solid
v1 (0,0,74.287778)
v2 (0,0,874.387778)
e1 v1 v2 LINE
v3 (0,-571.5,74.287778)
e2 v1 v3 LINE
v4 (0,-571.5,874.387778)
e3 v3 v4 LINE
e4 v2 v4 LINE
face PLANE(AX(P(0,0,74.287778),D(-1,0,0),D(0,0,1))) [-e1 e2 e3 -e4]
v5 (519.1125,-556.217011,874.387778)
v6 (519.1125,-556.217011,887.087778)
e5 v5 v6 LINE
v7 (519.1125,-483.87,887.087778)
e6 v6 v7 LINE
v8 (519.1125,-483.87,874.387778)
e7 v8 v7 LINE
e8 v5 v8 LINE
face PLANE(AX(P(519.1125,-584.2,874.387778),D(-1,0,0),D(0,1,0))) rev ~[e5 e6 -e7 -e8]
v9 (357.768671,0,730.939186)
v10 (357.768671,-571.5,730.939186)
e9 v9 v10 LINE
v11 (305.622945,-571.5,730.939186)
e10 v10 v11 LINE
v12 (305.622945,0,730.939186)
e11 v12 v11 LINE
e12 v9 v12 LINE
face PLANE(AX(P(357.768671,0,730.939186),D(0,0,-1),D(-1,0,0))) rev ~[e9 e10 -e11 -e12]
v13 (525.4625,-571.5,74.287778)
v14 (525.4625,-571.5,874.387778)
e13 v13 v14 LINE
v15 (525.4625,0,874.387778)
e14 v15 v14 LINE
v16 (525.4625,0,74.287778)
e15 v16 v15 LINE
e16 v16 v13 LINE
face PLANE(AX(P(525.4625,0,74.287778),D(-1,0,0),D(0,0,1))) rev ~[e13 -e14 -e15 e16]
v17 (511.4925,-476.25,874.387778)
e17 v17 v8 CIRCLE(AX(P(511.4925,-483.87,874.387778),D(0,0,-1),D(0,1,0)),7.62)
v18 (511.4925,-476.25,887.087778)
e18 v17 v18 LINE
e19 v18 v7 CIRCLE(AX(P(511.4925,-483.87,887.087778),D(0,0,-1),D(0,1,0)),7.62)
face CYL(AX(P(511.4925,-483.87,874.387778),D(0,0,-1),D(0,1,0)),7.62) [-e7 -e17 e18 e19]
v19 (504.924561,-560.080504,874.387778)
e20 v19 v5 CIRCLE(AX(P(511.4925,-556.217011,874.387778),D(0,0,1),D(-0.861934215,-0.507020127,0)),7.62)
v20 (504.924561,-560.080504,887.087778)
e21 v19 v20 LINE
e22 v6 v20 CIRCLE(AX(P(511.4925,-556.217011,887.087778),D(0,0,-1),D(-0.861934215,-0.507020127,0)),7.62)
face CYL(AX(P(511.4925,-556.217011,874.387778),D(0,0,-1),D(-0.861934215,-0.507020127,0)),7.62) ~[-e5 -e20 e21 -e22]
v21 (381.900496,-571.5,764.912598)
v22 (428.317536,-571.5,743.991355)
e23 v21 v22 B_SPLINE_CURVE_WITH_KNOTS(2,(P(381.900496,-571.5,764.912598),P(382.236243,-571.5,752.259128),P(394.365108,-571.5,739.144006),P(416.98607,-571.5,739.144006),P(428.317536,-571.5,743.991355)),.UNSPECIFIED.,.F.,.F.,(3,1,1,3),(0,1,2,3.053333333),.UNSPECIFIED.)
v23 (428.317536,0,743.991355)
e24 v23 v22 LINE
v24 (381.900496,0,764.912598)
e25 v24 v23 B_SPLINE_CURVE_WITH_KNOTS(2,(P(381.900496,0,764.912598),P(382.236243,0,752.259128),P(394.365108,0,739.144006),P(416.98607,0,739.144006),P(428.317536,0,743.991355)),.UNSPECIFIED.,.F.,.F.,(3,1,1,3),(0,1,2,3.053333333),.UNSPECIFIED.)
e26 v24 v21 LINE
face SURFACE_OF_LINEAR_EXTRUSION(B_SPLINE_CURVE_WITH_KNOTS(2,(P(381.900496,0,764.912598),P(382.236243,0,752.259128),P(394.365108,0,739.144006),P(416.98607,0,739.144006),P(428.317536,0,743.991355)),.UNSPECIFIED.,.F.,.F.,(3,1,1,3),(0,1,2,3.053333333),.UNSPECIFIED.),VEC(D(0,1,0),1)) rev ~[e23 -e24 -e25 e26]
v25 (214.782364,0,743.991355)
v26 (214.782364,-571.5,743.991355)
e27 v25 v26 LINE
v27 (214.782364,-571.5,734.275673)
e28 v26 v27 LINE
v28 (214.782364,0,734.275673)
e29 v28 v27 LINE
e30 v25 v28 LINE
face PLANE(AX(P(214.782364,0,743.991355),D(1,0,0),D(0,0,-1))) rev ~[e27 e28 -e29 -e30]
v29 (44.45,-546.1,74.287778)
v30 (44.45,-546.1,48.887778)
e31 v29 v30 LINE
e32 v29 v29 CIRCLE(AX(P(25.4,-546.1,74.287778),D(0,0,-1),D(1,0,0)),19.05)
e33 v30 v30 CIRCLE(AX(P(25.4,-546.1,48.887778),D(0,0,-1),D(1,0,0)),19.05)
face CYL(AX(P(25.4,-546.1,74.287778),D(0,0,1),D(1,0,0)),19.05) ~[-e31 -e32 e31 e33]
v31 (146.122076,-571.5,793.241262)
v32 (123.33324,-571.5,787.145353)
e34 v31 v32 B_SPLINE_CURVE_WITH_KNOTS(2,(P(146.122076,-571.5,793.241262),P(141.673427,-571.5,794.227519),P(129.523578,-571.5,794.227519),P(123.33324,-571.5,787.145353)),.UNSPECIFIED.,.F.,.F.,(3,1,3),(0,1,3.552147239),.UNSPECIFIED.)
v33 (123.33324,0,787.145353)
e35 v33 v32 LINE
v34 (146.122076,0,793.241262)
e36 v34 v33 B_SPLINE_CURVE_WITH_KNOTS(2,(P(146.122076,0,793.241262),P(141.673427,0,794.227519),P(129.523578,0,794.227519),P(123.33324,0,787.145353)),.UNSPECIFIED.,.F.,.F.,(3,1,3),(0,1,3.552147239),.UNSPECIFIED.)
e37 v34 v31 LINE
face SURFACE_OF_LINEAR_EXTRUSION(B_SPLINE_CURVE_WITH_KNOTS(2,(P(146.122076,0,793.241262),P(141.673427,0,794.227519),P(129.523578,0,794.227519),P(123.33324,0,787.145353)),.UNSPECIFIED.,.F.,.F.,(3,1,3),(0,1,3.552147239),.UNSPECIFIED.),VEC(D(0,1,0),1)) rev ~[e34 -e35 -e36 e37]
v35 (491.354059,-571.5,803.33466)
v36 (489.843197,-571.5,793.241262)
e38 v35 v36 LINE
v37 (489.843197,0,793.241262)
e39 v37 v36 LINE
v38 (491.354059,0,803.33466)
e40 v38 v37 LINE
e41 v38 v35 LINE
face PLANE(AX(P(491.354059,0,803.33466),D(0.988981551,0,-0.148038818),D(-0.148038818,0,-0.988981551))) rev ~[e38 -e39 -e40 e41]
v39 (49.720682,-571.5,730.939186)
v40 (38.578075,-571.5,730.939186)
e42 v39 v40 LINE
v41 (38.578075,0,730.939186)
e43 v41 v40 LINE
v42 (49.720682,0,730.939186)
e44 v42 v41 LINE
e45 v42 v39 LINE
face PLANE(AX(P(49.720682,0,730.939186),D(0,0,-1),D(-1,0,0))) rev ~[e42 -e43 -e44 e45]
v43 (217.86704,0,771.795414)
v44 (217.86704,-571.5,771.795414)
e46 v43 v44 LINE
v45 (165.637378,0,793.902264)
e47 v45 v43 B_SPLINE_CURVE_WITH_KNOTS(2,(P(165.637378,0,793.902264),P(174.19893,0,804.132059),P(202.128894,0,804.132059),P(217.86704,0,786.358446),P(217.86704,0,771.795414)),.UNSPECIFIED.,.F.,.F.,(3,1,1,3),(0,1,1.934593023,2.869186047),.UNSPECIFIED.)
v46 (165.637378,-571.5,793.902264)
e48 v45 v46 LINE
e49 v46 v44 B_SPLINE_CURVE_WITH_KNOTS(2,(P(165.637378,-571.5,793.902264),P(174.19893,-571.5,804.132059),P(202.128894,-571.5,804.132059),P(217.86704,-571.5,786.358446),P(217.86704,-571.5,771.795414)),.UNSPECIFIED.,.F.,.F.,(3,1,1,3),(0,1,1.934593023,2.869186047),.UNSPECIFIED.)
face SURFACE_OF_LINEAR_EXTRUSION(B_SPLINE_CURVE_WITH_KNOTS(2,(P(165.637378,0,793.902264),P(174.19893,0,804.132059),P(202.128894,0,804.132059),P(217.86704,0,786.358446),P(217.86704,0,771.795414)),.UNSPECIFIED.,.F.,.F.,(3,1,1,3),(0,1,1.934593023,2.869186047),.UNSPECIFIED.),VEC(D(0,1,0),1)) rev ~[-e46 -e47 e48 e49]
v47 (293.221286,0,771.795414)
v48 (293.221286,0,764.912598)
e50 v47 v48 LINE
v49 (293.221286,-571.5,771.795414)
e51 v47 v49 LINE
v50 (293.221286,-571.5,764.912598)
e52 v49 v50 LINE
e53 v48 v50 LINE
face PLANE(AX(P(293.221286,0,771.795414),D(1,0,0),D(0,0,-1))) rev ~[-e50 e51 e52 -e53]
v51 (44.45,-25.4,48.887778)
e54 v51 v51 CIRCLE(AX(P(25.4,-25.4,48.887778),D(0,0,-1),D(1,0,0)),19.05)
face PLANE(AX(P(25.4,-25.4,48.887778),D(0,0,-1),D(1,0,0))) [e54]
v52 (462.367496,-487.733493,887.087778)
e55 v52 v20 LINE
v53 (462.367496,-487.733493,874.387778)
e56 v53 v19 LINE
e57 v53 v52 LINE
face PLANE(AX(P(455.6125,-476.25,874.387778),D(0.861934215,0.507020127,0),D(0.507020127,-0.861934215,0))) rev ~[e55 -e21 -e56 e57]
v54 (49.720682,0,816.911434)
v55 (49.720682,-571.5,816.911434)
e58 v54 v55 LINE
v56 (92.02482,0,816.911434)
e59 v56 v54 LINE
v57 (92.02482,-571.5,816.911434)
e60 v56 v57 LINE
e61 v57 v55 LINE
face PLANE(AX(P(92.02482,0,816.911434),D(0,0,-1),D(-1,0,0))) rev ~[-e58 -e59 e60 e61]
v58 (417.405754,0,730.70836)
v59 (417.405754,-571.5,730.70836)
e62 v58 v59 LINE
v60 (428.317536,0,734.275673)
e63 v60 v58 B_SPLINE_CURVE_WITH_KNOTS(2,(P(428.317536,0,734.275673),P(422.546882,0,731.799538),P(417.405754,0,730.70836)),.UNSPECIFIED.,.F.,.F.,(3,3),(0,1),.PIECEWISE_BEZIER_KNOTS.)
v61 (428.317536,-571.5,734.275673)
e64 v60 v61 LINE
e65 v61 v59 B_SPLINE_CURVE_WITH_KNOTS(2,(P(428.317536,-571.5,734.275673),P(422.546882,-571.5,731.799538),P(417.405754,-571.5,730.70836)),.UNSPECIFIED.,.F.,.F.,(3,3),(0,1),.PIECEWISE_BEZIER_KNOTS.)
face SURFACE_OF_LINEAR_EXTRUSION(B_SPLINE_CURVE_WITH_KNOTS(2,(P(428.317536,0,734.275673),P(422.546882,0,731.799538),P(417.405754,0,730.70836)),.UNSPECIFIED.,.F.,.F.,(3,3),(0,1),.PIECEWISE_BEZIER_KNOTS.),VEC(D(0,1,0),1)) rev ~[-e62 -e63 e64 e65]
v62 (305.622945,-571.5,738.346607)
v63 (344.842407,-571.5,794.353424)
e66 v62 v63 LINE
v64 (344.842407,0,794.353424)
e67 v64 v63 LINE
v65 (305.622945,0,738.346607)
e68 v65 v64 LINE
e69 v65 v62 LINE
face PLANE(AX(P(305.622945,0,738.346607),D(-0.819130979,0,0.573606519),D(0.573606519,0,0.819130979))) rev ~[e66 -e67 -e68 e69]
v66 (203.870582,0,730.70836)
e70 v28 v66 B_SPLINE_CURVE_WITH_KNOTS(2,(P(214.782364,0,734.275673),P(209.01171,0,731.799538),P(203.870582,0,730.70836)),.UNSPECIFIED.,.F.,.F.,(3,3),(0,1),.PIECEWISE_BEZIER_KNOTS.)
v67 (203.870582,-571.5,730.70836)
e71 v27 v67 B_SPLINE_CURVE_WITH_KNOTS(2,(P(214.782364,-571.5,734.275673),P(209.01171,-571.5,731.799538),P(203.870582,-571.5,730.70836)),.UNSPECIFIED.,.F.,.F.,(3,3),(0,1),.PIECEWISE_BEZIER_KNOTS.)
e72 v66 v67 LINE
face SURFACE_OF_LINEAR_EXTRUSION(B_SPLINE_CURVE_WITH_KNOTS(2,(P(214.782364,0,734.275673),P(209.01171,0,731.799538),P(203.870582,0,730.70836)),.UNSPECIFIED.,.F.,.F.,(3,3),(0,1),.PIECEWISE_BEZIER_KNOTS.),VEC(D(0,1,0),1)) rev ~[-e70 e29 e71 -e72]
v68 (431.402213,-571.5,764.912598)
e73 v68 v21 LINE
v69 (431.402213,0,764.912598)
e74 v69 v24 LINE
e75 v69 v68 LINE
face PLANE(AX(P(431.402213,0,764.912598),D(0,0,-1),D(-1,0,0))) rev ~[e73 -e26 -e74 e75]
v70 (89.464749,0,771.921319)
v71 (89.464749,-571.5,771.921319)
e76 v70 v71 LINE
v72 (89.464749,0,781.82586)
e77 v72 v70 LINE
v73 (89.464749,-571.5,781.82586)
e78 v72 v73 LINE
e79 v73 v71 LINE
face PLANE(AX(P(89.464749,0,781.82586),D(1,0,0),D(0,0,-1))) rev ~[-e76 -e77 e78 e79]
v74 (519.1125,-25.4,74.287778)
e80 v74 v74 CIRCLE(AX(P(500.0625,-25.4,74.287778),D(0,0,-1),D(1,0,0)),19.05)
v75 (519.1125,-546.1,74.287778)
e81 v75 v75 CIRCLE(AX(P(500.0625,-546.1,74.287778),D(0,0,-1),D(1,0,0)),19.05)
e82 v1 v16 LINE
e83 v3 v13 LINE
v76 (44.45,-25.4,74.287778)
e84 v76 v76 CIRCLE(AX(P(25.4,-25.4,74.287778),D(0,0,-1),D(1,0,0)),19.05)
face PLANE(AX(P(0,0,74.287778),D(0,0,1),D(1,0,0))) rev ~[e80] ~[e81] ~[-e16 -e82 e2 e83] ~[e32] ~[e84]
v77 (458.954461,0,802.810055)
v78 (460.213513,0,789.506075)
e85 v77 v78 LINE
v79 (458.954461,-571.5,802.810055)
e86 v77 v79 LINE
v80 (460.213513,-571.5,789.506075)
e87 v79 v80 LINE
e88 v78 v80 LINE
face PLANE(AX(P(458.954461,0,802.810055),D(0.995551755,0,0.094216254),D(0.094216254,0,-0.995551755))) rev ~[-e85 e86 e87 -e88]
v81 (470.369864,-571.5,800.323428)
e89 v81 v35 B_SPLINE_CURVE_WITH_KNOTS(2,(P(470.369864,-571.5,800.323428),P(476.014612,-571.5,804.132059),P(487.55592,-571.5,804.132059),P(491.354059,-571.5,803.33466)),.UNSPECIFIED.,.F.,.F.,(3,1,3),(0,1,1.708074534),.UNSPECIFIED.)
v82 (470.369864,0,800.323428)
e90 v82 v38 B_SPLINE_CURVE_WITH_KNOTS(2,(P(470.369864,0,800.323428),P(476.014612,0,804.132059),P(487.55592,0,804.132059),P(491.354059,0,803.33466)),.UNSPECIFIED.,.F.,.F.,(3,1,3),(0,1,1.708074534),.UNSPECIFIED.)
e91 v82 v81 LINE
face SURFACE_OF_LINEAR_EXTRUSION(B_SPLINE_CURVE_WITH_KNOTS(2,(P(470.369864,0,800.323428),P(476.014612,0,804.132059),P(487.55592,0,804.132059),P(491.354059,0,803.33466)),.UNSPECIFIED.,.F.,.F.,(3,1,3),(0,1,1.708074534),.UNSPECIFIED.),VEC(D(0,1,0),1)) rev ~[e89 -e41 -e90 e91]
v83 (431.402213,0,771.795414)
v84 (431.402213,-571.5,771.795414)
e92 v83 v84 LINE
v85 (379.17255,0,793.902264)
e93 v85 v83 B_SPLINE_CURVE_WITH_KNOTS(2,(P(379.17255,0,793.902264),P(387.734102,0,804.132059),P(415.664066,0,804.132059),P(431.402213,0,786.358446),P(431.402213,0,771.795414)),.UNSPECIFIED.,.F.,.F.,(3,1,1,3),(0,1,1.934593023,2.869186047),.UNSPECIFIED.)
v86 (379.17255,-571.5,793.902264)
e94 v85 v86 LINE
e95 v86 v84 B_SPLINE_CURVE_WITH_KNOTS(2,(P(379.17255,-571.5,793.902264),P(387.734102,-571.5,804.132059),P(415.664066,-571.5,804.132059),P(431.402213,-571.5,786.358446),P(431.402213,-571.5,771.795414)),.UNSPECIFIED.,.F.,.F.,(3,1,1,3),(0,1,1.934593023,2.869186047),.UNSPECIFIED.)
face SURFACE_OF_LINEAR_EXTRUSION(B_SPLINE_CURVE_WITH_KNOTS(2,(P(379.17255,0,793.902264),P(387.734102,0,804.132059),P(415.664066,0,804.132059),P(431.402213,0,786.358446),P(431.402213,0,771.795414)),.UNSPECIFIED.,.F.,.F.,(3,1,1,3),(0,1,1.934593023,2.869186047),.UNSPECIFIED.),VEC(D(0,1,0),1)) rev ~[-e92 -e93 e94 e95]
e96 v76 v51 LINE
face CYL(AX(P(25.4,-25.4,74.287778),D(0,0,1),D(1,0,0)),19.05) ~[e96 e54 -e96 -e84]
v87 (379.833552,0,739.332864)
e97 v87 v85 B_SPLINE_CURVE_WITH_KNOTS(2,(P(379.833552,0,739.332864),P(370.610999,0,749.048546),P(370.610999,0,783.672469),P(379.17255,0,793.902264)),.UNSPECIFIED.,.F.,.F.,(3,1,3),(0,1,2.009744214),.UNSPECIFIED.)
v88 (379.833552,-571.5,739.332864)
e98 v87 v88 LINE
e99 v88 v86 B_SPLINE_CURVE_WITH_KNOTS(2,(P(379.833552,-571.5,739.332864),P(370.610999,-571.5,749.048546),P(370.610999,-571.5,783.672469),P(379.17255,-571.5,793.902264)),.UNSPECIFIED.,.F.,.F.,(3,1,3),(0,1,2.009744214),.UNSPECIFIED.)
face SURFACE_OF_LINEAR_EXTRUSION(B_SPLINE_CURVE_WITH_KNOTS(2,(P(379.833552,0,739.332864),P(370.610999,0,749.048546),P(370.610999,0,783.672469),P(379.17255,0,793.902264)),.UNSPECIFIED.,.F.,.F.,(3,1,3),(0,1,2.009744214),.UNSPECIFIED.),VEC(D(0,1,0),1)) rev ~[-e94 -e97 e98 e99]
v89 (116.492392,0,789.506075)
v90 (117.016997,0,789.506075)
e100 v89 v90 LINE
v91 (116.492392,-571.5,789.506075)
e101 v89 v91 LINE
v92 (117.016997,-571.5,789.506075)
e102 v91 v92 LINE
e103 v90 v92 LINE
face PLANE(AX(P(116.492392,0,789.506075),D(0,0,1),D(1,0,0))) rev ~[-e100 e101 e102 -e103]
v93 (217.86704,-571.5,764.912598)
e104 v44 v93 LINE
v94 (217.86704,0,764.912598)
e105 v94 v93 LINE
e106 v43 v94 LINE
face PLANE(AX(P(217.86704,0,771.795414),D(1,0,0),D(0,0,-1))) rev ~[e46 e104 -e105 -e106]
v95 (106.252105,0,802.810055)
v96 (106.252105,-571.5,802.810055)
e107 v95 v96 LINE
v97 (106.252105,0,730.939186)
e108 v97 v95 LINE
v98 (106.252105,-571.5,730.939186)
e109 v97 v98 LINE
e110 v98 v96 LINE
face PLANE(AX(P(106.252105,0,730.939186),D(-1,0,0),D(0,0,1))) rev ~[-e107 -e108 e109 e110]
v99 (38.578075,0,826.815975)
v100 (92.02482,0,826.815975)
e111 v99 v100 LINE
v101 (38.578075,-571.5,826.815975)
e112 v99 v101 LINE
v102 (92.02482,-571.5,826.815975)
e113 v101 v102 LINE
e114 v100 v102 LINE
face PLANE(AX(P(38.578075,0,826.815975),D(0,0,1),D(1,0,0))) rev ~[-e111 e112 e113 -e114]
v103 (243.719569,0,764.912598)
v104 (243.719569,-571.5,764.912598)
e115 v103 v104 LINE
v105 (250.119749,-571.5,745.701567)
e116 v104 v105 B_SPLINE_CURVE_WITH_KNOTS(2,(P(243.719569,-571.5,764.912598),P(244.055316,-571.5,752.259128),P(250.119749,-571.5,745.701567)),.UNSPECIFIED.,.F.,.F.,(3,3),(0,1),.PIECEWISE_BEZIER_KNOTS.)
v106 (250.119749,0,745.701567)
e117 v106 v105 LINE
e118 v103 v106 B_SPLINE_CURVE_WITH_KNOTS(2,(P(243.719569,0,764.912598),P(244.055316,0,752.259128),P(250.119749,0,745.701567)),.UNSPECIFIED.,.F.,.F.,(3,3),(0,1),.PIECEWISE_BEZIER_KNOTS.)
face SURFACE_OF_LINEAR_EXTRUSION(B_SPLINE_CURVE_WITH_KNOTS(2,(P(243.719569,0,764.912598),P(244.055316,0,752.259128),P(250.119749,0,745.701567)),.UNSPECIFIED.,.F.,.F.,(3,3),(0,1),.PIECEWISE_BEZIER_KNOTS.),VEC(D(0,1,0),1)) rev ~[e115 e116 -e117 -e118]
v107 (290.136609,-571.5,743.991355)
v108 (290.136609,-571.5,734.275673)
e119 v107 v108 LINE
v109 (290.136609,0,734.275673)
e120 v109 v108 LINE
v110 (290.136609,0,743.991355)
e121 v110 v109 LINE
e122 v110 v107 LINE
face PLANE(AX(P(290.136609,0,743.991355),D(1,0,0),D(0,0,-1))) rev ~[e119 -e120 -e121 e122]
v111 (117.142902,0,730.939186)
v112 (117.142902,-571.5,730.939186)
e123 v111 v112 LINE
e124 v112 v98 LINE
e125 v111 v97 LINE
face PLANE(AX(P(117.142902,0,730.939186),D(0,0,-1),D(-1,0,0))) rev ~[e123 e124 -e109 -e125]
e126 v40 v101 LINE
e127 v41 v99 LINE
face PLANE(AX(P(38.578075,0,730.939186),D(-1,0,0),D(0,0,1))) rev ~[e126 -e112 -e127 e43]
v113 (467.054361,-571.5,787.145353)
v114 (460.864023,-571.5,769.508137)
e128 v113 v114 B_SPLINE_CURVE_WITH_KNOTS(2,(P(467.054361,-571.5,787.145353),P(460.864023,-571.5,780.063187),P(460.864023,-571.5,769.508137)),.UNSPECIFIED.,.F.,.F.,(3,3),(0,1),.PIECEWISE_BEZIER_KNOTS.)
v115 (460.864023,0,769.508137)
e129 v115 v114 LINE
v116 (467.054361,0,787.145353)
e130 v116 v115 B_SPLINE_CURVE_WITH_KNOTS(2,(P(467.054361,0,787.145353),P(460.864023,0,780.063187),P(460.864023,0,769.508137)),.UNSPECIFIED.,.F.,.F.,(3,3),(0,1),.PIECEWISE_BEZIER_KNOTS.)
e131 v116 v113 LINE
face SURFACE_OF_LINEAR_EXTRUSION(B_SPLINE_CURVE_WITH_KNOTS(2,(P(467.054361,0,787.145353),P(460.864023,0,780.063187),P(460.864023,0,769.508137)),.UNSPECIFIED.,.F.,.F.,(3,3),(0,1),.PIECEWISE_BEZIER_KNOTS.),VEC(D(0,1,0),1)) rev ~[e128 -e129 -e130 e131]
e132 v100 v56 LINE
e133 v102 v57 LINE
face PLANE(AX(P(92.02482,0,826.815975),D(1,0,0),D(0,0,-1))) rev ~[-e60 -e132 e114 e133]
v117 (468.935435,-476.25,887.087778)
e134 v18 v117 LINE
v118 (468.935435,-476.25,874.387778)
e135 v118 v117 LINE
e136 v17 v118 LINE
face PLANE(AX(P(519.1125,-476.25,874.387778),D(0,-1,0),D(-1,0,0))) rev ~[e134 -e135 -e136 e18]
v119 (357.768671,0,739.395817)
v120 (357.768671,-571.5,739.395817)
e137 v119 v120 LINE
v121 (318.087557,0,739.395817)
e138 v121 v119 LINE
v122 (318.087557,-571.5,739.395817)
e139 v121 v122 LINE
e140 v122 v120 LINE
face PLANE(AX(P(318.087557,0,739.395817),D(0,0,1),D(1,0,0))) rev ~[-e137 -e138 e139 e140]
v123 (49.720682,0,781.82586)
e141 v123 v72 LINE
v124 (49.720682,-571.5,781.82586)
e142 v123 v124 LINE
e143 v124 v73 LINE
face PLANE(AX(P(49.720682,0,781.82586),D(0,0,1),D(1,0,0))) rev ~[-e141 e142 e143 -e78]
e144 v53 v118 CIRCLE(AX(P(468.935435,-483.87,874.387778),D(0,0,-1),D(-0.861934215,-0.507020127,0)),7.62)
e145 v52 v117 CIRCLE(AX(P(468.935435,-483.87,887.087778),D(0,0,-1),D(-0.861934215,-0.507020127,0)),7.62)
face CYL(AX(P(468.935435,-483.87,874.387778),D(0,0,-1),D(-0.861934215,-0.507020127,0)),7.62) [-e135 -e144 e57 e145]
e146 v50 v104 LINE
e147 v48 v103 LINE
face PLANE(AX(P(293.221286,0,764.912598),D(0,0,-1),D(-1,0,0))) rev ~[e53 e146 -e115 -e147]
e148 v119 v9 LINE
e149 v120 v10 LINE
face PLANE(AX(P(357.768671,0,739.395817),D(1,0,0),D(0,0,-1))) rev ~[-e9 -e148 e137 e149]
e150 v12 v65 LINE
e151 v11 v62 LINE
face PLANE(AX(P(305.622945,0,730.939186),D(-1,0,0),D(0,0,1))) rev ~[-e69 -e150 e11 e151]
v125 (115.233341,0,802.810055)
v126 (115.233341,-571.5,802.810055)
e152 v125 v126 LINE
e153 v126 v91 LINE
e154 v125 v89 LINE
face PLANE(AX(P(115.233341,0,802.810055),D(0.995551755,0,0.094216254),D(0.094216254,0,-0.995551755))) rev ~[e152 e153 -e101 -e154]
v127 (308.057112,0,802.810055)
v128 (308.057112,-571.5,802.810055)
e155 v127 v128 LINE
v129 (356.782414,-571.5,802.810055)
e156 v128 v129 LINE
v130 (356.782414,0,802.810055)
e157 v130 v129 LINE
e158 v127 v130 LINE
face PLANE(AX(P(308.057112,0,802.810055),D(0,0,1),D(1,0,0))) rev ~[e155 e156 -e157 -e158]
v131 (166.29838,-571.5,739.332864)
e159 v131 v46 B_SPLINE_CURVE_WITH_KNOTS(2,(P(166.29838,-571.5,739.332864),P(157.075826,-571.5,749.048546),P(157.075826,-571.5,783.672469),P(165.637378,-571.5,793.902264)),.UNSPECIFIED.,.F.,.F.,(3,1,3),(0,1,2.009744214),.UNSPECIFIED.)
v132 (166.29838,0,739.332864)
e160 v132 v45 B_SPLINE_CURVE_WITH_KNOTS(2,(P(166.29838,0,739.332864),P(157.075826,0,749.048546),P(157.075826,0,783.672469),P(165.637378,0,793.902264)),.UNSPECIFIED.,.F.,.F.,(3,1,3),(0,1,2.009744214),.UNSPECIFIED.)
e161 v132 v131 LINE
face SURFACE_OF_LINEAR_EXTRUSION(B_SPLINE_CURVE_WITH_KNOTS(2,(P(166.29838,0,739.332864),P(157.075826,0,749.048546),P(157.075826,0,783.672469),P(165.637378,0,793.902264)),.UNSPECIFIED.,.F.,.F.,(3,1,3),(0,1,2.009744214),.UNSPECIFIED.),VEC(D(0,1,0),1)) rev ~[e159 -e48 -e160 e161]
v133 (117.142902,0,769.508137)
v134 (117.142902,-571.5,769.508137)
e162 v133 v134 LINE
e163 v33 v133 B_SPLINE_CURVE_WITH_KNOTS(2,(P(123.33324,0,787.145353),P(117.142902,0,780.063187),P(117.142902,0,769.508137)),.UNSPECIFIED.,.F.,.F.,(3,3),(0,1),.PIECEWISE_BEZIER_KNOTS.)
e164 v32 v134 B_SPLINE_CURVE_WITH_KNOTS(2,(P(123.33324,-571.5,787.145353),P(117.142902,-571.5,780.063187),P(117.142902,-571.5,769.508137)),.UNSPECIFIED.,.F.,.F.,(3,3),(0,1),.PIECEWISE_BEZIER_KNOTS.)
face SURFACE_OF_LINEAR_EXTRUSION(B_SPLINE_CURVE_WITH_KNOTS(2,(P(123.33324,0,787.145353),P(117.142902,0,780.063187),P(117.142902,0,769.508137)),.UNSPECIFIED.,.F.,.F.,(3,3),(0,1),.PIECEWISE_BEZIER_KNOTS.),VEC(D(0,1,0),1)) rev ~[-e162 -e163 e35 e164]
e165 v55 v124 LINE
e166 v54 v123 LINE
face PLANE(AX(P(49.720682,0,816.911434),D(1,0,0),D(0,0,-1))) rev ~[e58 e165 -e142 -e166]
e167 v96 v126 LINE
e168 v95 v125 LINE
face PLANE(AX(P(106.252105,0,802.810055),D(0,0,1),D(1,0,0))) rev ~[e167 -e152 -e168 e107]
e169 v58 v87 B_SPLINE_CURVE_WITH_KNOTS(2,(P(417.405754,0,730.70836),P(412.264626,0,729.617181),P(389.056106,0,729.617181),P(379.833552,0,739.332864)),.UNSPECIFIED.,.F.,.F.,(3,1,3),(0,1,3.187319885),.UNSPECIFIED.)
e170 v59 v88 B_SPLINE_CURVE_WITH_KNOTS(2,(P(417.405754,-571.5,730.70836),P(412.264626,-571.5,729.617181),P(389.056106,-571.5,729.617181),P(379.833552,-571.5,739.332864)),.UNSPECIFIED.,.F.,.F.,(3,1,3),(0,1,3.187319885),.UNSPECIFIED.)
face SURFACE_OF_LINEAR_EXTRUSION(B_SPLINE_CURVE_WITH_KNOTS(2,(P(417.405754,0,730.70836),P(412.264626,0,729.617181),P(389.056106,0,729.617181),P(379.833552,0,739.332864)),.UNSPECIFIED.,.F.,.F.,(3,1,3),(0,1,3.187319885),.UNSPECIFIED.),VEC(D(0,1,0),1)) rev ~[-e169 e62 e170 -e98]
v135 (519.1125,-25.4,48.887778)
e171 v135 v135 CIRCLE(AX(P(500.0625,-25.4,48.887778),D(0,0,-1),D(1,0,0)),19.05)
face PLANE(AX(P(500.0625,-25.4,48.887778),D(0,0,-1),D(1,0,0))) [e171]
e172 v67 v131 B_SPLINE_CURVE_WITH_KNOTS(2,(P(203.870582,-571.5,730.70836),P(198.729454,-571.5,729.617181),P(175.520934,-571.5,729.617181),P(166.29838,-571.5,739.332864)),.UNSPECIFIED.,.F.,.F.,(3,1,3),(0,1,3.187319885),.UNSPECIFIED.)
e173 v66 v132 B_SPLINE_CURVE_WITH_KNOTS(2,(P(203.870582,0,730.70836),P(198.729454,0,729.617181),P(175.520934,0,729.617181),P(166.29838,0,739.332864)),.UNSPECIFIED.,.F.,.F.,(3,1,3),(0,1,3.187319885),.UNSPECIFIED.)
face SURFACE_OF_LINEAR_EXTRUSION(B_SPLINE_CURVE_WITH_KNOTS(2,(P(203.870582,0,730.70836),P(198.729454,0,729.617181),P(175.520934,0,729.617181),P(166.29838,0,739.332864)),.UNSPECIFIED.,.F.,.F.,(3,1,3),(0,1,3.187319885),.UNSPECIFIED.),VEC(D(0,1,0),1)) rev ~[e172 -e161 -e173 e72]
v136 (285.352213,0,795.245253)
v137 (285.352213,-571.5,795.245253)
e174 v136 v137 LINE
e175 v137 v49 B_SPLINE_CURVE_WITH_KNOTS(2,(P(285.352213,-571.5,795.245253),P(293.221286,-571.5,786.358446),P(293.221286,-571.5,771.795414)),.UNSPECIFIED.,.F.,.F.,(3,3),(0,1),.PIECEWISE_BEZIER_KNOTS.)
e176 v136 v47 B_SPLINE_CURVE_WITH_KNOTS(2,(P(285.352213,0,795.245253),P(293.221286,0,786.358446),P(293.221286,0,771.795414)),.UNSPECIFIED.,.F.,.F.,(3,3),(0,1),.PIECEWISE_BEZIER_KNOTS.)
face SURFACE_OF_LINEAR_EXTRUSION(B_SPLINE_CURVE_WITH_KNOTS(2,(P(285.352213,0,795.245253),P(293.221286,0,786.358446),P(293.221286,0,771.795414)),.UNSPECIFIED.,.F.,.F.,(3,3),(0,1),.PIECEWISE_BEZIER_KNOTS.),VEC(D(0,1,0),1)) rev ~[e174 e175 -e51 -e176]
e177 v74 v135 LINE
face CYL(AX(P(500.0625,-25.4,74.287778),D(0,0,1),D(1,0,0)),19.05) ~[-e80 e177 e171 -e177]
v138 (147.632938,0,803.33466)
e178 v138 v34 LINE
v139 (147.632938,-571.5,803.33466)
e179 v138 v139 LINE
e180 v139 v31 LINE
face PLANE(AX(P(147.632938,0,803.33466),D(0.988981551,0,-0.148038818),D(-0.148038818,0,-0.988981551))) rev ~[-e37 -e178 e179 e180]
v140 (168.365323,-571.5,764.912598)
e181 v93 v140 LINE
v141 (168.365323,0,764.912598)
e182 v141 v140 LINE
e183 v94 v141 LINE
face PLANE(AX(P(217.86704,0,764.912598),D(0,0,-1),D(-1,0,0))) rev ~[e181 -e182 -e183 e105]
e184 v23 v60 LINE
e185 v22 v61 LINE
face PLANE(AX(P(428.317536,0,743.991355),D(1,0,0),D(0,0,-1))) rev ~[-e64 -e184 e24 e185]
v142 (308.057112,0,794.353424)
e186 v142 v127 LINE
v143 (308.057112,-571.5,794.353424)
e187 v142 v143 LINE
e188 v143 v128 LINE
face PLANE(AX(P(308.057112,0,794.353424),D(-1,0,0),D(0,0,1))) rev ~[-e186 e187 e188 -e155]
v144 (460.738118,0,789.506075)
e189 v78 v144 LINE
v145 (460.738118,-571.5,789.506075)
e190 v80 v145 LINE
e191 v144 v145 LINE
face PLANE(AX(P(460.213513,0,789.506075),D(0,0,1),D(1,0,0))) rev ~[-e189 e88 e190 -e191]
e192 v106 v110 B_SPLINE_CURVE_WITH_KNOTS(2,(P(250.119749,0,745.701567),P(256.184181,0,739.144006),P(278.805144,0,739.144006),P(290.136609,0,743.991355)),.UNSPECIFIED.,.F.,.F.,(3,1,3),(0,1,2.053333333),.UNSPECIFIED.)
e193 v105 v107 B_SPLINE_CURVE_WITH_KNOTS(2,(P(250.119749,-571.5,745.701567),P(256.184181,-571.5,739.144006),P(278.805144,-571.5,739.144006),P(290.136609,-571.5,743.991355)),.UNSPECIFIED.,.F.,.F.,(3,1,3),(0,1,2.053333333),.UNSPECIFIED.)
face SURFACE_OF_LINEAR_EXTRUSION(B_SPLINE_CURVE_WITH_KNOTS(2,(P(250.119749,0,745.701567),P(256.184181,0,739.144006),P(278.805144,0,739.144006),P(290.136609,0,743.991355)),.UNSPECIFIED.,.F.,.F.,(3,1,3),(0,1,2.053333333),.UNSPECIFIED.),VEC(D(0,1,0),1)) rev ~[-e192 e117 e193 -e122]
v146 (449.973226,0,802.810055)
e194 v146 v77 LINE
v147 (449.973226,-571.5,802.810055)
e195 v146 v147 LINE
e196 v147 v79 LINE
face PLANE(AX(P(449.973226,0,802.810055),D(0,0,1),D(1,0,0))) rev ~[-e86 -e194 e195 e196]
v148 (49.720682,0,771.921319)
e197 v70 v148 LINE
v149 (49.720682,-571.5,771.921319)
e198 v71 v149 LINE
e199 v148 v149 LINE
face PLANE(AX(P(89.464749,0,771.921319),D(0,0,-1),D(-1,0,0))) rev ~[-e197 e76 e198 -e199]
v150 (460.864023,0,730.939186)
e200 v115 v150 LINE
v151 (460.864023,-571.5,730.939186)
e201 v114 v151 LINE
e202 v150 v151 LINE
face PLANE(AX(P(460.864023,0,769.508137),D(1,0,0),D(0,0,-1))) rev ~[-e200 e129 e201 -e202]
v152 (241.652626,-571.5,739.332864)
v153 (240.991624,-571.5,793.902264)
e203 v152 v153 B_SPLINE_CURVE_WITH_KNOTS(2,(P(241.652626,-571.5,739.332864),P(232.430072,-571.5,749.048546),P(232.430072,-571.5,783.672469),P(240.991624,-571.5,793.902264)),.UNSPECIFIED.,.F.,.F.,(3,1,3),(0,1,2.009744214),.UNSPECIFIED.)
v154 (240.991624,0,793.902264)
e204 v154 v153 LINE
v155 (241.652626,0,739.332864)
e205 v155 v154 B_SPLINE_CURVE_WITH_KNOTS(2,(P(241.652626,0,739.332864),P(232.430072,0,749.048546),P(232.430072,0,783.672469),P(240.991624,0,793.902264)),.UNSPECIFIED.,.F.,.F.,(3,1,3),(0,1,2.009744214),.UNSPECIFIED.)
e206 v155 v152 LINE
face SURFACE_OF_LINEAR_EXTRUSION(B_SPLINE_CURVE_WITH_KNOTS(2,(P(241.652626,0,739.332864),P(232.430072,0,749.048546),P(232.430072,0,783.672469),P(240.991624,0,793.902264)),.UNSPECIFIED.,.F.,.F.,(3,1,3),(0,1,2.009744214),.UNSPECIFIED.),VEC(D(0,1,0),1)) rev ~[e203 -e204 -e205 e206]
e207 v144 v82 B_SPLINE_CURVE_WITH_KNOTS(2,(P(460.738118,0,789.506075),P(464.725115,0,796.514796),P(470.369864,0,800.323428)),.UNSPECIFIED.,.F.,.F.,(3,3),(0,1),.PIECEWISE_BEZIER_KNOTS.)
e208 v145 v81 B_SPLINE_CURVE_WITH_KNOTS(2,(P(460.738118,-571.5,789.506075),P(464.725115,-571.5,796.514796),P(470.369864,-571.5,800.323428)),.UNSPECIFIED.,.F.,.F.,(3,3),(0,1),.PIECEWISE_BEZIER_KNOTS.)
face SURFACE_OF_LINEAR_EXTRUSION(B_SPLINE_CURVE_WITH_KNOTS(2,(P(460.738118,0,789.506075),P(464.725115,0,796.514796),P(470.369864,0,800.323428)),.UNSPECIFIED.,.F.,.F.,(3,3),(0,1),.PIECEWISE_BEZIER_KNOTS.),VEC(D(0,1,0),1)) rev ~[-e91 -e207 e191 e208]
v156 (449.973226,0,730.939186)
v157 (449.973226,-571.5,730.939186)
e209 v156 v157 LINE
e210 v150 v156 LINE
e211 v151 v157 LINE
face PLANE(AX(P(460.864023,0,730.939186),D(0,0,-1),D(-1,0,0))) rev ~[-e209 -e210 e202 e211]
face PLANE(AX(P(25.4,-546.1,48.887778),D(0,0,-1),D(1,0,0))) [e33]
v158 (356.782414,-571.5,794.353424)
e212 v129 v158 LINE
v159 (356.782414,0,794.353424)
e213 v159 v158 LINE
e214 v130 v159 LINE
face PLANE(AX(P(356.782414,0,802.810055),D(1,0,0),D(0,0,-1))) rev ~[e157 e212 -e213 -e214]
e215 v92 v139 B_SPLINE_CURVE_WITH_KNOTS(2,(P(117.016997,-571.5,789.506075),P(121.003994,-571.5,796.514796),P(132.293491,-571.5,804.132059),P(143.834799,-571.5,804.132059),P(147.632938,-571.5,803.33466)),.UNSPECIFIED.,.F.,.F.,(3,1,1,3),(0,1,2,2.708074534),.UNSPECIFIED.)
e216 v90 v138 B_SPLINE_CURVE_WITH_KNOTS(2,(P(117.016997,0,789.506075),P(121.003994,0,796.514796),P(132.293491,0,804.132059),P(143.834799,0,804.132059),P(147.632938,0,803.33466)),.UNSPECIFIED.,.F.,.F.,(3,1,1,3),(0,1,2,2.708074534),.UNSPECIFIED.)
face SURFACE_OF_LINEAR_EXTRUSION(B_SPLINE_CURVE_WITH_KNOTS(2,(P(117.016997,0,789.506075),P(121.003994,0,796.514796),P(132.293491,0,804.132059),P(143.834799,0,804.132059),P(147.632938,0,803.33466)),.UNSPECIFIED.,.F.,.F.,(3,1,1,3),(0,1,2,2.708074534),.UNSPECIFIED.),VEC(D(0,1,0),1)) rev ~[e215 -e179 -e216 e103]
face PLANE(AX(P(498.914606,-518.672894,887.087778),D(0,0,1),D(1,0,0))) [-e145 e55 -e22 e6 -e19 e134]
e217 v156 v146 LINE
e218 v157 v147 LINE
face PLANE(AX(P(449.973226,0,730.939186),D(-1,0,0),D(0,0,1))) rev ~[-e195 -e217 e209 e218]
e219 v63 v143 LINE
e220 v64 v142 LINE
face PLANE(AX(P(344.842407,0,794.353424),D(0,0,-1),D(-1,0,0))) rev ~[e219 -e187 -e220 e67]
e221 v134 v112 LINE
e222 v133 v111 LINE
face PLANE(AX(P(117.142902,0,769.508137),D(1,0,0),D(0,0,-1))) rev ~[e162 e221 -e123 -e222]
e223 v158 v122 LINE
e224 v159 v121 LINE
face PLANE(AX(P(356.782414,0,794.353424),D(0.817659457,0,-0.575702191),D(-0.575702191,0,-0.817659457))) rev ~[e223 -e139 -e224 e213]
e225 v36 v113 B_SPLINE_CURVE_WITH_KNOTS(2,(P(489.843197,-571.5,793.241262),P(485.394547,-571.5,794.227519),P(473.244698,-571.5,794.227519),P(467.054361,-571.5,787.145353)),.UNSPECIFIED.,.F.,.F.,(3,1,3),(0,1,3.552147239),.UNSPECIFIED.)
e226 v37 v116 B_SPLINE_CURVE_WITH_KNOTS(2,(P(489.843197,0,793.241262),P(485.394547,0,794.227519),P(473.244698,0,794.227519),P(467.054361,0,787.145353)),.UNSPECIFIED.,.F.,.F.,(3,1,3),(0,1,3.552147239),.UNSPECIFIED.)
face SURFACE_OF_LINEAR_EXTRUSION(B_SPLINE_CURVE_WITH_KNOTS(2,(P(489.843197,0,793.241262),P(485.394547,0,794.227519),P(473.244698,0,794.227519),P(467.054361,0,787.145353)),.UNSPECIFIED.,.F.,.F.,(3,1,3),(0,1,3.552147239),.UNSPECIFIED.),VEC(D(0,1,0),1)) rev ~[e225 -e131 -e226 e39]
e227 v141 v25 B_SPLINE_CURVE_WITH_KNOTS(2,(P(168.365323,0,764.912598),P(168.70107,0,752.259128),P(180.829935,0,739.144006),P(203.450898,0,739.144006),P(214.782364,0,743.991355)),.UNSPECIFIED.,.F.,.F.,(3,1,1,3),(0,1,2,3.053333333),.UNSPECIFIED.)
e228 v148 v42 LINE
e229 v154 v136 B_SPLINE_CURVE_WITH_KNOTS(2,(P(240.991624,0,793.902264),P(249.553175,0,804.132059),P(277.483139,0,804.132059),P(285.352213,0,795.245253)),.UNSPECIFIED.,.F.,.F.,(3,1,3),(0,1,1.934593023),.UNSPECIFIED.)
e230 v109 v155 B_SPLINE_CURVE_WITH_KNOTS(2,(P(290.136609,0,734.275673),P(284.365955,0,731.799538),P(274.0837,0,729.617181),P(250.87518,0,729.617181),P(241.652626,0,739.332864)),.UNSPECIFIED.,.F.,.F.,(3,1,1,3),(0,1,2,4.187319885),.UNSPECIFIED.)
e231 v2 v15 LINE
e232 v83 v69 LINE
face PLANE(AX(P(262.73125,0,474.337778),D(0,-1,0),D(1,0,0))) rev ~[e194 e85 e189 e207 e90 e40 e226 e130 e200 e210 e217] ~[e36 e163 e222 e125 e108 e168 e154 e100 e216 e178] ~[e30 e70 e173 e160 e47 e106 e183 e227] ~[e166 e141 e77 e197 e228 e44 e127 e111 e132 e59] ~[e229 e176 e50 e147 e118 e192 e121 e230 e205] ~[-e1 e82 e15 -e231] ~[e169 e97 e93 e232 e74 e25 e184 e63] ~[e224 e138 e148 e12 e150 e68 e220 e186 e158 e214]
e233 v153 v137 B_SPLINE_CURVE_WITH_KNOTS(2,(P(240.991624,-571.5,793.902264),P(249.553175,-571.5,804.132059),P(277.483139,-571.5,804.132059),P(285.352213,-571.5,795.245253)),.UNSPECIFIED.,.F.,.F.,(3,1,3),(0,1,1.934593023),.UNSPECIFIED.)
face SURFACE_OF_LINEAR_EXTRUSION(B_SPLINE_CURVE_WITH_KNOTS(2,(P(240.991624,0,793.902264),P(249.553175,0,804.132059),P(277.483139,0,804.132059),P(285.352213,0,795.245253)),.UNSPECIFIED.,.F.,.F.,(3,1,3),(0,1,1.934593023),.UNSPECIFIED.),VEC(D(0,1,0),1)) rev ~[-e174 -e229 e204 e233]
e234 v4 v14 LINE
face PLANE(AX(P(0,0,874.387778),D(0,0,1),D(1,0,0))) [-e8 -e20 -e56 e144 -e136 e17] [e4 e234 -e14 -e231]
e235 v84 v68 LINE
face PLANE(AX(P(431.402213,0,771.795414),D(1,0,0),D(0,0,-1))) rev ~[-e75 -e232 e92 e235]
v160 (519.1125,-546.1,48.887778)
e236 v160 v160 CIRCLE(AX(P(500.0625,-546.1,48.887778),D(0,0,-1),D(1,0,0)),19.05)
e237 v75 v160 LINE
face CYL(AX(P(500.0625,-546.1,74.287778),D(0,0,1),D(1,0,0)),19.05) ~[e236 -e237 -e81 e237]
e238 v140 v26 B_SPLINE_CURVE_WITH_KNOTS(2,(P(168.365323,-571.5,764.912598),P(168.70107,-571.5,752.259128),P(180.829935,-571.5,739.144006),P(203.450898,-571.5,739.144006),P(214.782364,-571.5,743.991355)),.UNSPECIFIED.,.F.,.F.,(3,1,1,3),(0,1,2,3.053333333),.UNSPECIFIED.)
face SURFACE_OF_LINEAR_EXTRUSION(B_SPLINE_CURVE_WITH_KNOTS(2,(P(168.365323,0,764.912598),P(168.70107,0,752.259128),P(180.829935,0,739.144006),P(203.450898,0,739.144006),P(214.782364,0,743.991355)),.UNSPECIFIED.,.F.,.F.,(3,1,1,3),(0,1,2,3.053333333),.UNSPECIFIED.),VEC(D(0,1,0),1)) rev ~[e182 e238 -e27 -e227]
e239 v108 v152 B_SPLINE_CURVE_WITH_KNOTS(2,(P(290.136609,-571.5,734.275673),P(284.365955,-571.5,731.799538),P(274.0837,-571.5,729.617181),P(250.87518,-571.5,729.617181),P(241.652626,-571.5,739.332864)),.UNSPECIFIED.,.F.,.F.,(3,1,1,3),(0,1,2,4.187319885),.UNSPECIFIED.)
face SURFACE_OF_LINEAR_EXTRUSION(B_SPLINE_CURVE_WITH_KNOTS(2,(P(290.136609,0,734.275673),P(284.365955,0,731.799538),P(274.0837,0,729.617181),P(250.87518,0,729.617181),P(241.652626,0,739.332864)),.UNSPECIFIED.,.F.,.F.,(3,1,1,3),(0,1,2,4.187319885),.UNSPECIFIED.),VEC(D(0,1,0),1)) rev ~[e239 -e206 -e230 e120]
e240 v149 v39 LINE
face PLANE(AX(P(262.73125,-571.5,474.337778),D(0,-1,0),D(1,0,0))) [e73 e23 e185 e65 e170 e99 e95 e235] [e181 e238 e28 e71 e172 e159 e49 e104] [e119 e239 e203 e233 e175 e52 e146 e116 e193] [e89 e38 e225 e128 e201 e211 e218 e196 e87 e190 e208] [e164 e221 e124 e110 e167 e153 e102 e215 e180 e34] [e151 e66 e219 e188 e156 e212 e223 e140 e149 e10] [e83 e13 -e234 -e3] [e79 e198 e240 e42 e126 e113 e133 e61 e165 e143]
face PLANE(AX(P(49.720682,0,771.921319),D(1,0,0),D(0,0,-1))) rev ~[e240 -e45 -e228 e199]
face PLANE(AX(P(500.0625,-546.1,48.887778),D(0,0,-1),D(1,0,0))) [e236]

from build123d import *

# Parameters (mm, degrees)
F0_W        = 525.4625
F0_H        = 800.1
F1_DEPTH    = 571.5
F2_R        = 19.05
F3_DEPTH    = 25.4
F5_DEPTH    = 12.7
F6_T1_DEPTH = 82.6574729689
F6_T3_DEPTH = 31.75
F6_T5_DEPTH = 46.0073370405


# Not quite as in the source:
# - a fillet or chamfer that OpenCascade refuses, or shapes differently, is made with other operations: its cross-section is extruded or revolved along the edge and cut away or added


with BuildPart() as f1:
    # F0 (on Front) → F1 (new body)
    with BuildSketch(Plane.XZ):
        with Locations((262.73125, 474.3377777734)):
            Rectangle(F0_W, F0_H)
        with BuildLine():
            add(Edge.make_bspline(
                [(126.6487428161, 800.3234279035), (132.2934913793, 804.132059369), (139.0504022989, 804.132059369)],
                knots=[0, 0, 0, 1, 1, 1], degree=2))
            add(Edge.make_bspline(
                [(139.0504022989, 804.132059369), (143.8347988506, 804.132059369), (147.6329382184, 803.3346599437)],
                knots=[0, 0, 0, 1, 1, 1], degree=2))
            Line((147.6329382184, 803.3346599437), (146.1220761494, 793.2412619552))
            add(Edge.make_bspline(
                [(146.1220761494, 793.2412619552), (141.6734267241, 794.2275191391), (138.2530028736, 794.2275191391)],
                knots=[0, 0, 0, 1, 1, 1], degree=2))
            add(Edge.make_bspline(
                [(138.2530028736, 794.2275191391), (129.5235775862, 794.2275191391), (123.3332399425, 787.1453531909)],
                knots=[0, 0, 0, 1, 1, 1], degree=2))
            add(Edge.make_bspline(
                [(123.3332399425, 787.1453531909), (117.1429022989, 780.0631872426), (117.1429022989, 769.5081369552)],
                knots=[0, 0, 0, 1, 1, 1], degree=2))
            Line((117.1429022989, 769.5081369552), (117.1429022989, 730.9391858058))
            Line((117.1429022989, 730.9391858058), (106.2521048851, 730.9391858058))
            Line((106.2521048851, 730.9391858058), (106.2521048851, 802.8100550587))
            Line((106.2521048851, 802.8100550587), (115.2333405172, 802.8100550587))
            Line((115.2333405172, 802.8100550587), (116.4923922414, 789.5060751736))
            Line((116.4923922414, 789.5060751736), (117.0169971264, 789.5060751736))
            add(Edge.make_bspline(
                [(117.0169971264, 789.5060751736), (121.0039942529, 796.514796438), (126.6487428161, 800.3234279035)],
                knots=[0, 0, 0, 1, 1, 1], degree=2))
        make_face(mode=Mode.SUBTRACT)
        Polygon((49.7206824713, 771.9213194265), (49.7206824713, 730.9391858058), (38.5780747126, 730.9391858058), (38.5780747126, 826.8159745989), (92.0248204023, 826.8159745989), (92.0248204023, 816.911434369), (49.7206824713, 816.911434369), (49.7206824713, 781.8258596564), (89.4647485632, 781.8258596564), (89.4647485632, 771.9213194265), align=None, mode=Mode.SUBTRACT)
        with BuildLine():
            add(Edge.make_bspline(
                [(203.8705818966, 730.7083596564), (198.729454023, 729.6171814955), (191.4479382184, 729.6171814955)],
                knots=[0, 0, 0, 1, 1, 1], degree=2))
            add(Edge.make_bspline(
                [(191.4479382184, 729.6171814955), (175.520933908, 729.6171814955), (166.2983800287, 739.3328639667)],
                knots=[0, 0, 0, 1, 1, 1], degree=2))
            add(Edge.make_bspline(
                [(166.2983800287, 739.3328639667), (157.0758261494, 749.048546438), (157.0758261494, 766.2765708633)],
                knots=[0, 0, 0, 1, 1, 1], degree=2))
            add(Edge.make_bspline(
                [(157.0758261494, 766.2765708633), (157.0758261494, 783.6724688518), (165.6373778736, 793.9022641104)],
                knots=[0, 0, 0, 1, 1, 1], degree=2))
            add(Edge.make_bspline(
                [(165.6373778736, 793.9022641104), (174.1989295977, 804.132059369), (188.6360560345, 804.132059369)],
                knots=[0, 0, 0, 1, 1, 1], degree=2))
            add(Edge.make_bspline(
                [(188.6360560345, 804.132059369), (202.1288936782, 804.132059369), (209.997966954, 795.2452526162)],
                knots=[0, 0, 0, 1, 1, 1], degree=2))
            add(Edge.make_bspline(
                [(209.997966954, 795.2452526162), (217.8670402299, 786.3584458633), (217.8670402299, 771.7954142541)],
                knots=[0, 0, 0, 1, 1, 1], degree=2))
            Line((217.8670402299, 771.7954142541), (217.8670402299, 764.9125981621))
            Line((217.8670402299, 764.9125981621), (168.3653232759, 764.9125981621))
            add(Edge.make_bspline(
                [(168.3653232759, 764.9125981621), (168.7010704023, 752.2591283346), (174.7655028736, 745.7015672713)],
                knots=[0, 0, 0, 1, 1, 1], degree=2))
            add(Edge.make_bspline(
                [(174.7655028736, 745.7015672713), (180.8299353448, 739.1440062081), (191.846637931, 739.1440062081)],
                knots=[0, 0, 0, 1, 1, 1], degree=2))
            add(Edge.make_bspline(
                [(191.846637931, 739.1440062081), (203.4508979885, 739.1440062081), (214.7823635057, 743.991355346)],
                knots=[0, 0, 0, 1, 1, 1], degree=2))
            Line((214.7823635057, 743.991355346), (214.7823635057, 734.2756728748))
            add(Edge.make_bspline(
                [(214.7823635057, 734.2756728748), (209.0117097701, 731.7995378173), (203.8705818966, 730.7083596564)],
                knots=[0, 0, 0, 1, 1, 1], degree=2))
        make_face(mode=Mode.SUBTRACT)
        with BuildLine():
            add(Edge.make_bspline(
                [(279.2248275862, 730.7083596564), (274.0836997126, 729.6171814955), (266.802183908, 729.6171814955)],
                knots=[0, 0, 0, 1, 1, 1], degree=2))
            add(Edge.make_bspline(
                [(266.802183908, 729.6171814955), (250.8751795977, 729.6171814955), (241.6526257184, 739.3328639667)],
                knots=[0, 0, 0, 1, 1, 1], degree=2))
            add(Edge.make_bspline(
                [(241.6526257184, 739.3328639667), (232.4300718391, 749.048546438), (232.4300718391, 766.2765708633)],
                knots=[0, 0, 0, 1, 1, 1], degree=2))
            add(Edge.make_bspline(
                [(232.4300718391, 766.2765708633), (232.4300718391, 783.6724688518), (240.9916235632, 793.9022641104)],
                knots=[0, 0, 0, 1, 1, 1], degree=2))
            add(Edge.make_bspline(
                [(240.9916235632, 793.9022641104), (249.5531752874, 804.132059369), (263.9903017241, 804.132059369)],
                knots=[0, 0, 0, 1, 1, 1], degree=2))
            add(Edge.make_bspline(
                [(263.9903017241, 804.132059369), (277.4831393678, 804.132059369), (285.3522126437, 795.2452526162)],
                knots=[0, 0, 0, 1, 1, 1], degree=2))
            add(Edge.make_bspline(
                [(285.3522126437, 795.2452526162), (293.2212859195, 786.3584458633), (293.2212859195, 771.7954142541)],
                knots=[0, 0, 0, 1, 1, 1], degree=2))
            Line((293.2212859195, 771.7954142541), (293.2212859195, 764.9125981621))
            Line((293.2212859195, 764.9125981621), (243.7195689655, 764.9125981621))
            add(Edge.make_bspline(
                [(243.7195689655, 764.9125981621), (244.055316092, 752.2591283346), (250.1197485632, 745.7015672713)],
                knots=[0, 0, 0, 1, 1, 1], degree=2))
            add(Edge.make_bspline(
                [(250.1197485632, 745.7015672713), (256.1841810345, 739.1440062081), (267.2008836207, 739.1440062081)],
                knots=[0, 0, 0, 1, 1, 1], degree=2))
            add(Edge.make_bspline(
                [(267.2008836207, 739.1440062081), (278.8051436782, 739.1440062081), (290.1366091954, 743.991355346)],
                knots=[0, 0, 0, 1, 1, 1], degree=2))
            Line((290.1366091954, 743.991355346), (290.1366091954, 734.2756728748))
            add(Edge.make_bspline(
                [(290.1366091954, 734.2756728748), (284.3659554598, 731.7995378173), (279.2248275862, 730.7083596564)],
                knots=[0, 0, 0, 1, 1, 1], degree=2))
        make_face(mode=Mode.SUBTRACT)
        Polygon((357.768670977, 739.3958165529), (357.768670977, 730.9391858058), (305.6229454023, 730.9391858058), (305.6229454023, 738.3466067828), (344.8424066092, 794.3534243116), (308.057112069, 794.3534243116), (308.057112069, 802.8100550587), (356.7824137931, 802.8100550587), (356.7824137931, 794.3534243116), (318.0875574713, 739.3958165529), align=None, mode=Mode.SUBTRACT)
        with BuildLine():
            add(Edge.make_bspline(
                [(417.4057543103, 730.7083596564), (412.2646264368, 729.6171814955), (404.9831106322, 729.6171814955)],
                knots=[0, 0, 0, 1, 1, 1], degree=2))
            add(Edge.make_bspline(
                [(404.9831106322, 729.6171814955), (389.0561063218, 729.6171814955), (379.8335524425, 739.3328639667)],
                knots=[0, 0, 0, 1, 1, 1], degree=2))
            add(Edge.make_bspline(
                [(379.8335524425, 739.3328639667), (370.6109985632, 749.048546438), (370.6109985632, 766.2765708633)],
                knots=[0, 0, 0, 1, 1, 1], degree=2))
            add(Edge.make_bspline(
                [(370.6109985632, 766.2765708633), (370.6109985632, 783.6724688518), (379.1725502874, 793.9022641104)],
                knots=[0, 0, 0, 1, 1, 1], degree=2))
            add(Edge.make_bspline(
                [(379.1725502874, 793.9022641104), (387.7341020115, 804.132059369), (402.1712284483, 804.132059369)],
                knots=[0, 0, 0, 1, 1, 1], degree=2))
            add(Edge.make_bspline(
                [(402.1712284483, 804.132059369), (415.664066092, 804.132059369), (423.5331393678, 795.2452526162)],
                knots=[0, 0, 0, 1, 1, 1], degree=2))
            add(Edge.make_bspline(
                [(423.5331393678, 795.2452526162), (431.4022126437, 786.3584458633), (431.4022126437, 771.7954142541)],
                knots=[0, 0, 0, 1, 1, 1], degree=2))
            Line((431.4022126437, 771.7954142541), (431.4022126437, 764.9125981621))
            Line((431.4022126437, 764.9125981621), (381.9004956897, 764.9125981621))
            add(Edge.make_bspline(
                [(381.9004956897, 764.9125981621), (382.2362428161, 752.2591283346), (388.3006752874, 745.7015672713)],
                knots=[0, 0, 0, 1, 1, 1], degree=2))
            add(Edge.make_bspline(
                [(388.3006752874, 745.7015672713), (394.3651077586, 739.1440062081), (405.3818103448, 739.1440062081)],
                knots=[0, 0, 0, 1, 1, 1], degree=2))
            add(Edge.make_bspline(
                [(405.3818103448, 739.1440062081), (416.9860704023, 739.1440062081), (428.3175359195, 743.991355346)],
                knots=[0, 0, 0, 1, 1, 1], degree=2))
            Line((428.3175359195, 743.991355346), (428.3175359195, 734.2756728748))
            add(Edge.make_bspline(
                [(428.3175359195, 734.2756728748), (422.5468821839, 731.7995378173), (417.4057543103, 730.7083596564)],
                knots=[0, 0, 0, 1, 1, 1], degree=2))
        make_face(mode=Mode.SUBTRACT)
        with BuildLine():
            add(Edge.make_bspline(
                [(470.3698635057, 800.3234279035), (476.014612069, 804.132059369), (482.7715229885, 804.132059369)],
                knots=[0, 0, 0, 1, 1, 1], degree=2))
            add(Edge.make_bspline(
                [(482.7715229885, 804.132059369), (487.5559195402, 804.132059369), (491.354058908, 803.3346599437)],
                knots=[0, 0, 0, 1, 1, 1], degree=2))
            Line((491.354058908, 803.3346599437), (489.8431968391, 793.2412619552))
            add(Edge.make_bspline(
                [(489.8431968391, 793.2412619552), (485.3945474138, 794.2275191391), (481.9741235632, 794.2275191391)],
                knots=[0, 0, 0, 1, 1, 1], degree=2))
            add(Edge.make_bspline(
                [(481.9741235632, 794.2275191391), (473.2446982759, 794.2275191391), (467.0543606322, 787.1453531909)],
                knots=[0, 0, 0, 1, 1, 1], degree=2))
            add(Edge.make_bspline(
                [(467.0543606322, 787.1453531909), (460.8640229885, 780.0631872426), (460.8640229885, 769.5081369552)],
                knots=[0, 0, 0, 1, 1, 1], degree=2))
            Line((460.8640229885, 769.5081369552), (460.8640229885, 730.9391858058))
            Line((460.8640229885, 730.9391858058), (449.9732255747, 730.9391858058))
            Line((449.9732255747, 730.9391858058), (449.9732255747, 802.8100550587))
            Line((449.9732255747, 802.8100550587), (458.9544612069, 802.8100550587))
            Line((458.9544612069, 802.8100550587), (460.213512931, 789.5060751736))
            Line((460.213512931, 789.5060751736), (460.7381178161, 789.5060751736))
            add(Edge.make_bspline(
                [(460.7381178161, 789.5060751736), (464.7251149425, 796.514796438), (470.3698635057, 800.3234279035)],
                knots=[0, 0, 0, 1, 1, 1], degree=2))
        make_face(mode=Mode.SUBTRACT)
    extrude(amount=F1_DEPTH)

    # F2 (on face) → F3 (join)
    with BuildSketch(Plane(origin=(0, 0, 74.2877777734), x_dir=(1, 0, 0), z_dir=(0, 0, -1))):
        with Locations((25.4, 25.4)):
            Circle(F2_R)
        with Locations((25.4, 546.1)):
            Circle(F2_R)
        with Locations((500.0625, 546.1)):
            Circle(F2_R)
        with Locations((500.0625, 25.4)):
            Circle(F2_R)
    extrude(amount=F3_DEPTH)

    # F4 (on face) → F5 (join)
    with BuildSketch(Plane.XY.offset(874.3877777734)):
        Polygon((519.1125, -476.25), (455.6125, -476.25), (519.1125, -584.2), align=None)
    extrude(amount=F5_DEPTH)

    # F6: fillet of radius 7.62 on 3 edges, made by hand

    # F6_s2 → F6_t1 (cut)
    with BuildSketch(Plane.XY.offset(874.3877777734)):
        with BuildLine():
            ThreePointArc((504.9245612805, -560.0805041768), (513.4945872805, -563.5692925345), (519.1125, -556.2170108124))
            Line((519.1125, -556.2170108124), (519.1125, -584.2))
            Line((519.1125, -584.2), (504.9245612805, -560.0805041768))
        make_face()
    extrude(amount=F6_T1_DEPTH, mode=Mode.SUBTRACT)

    # F6_s4 → F6_t3 (cut)
    with BuildSketch(Plane.XY.offset(874.3877777734)):
        with BuildLine():
            ThreePointArc((511.4925, -476.25), (516.8806536726, -478.4818463274), (519.1125, -483.87))
            Line((519.1125, -483.87), (519.1125, -476.25))
            Line((519.1125, -476.25), (511.4925, -476.25))
        make_face()
    extrude(amount=F6_T3_DEPTH, mode=Mode.SUBTRACT)

    # F6_s6 → F6_t5 (cut)
    with BuildSketch(Plane.XY.offset(874.3877777734)):
        with BuildLine():
            ThreePointArc((462.3674960967, -487.7334933644), (462.3208970608, -480.0868412297), (468.9354348162, -476.25))
            Line((468.9354348162, -476.25), (455.6125, -476.25))
            Line((455.6125, -476.25), (462.3674960967, -487.7334933644))
        make_face()
    extrude(amount=F6_T5_DEPTH, mode=Mode.SUBTRACT)


solid = f1.part
